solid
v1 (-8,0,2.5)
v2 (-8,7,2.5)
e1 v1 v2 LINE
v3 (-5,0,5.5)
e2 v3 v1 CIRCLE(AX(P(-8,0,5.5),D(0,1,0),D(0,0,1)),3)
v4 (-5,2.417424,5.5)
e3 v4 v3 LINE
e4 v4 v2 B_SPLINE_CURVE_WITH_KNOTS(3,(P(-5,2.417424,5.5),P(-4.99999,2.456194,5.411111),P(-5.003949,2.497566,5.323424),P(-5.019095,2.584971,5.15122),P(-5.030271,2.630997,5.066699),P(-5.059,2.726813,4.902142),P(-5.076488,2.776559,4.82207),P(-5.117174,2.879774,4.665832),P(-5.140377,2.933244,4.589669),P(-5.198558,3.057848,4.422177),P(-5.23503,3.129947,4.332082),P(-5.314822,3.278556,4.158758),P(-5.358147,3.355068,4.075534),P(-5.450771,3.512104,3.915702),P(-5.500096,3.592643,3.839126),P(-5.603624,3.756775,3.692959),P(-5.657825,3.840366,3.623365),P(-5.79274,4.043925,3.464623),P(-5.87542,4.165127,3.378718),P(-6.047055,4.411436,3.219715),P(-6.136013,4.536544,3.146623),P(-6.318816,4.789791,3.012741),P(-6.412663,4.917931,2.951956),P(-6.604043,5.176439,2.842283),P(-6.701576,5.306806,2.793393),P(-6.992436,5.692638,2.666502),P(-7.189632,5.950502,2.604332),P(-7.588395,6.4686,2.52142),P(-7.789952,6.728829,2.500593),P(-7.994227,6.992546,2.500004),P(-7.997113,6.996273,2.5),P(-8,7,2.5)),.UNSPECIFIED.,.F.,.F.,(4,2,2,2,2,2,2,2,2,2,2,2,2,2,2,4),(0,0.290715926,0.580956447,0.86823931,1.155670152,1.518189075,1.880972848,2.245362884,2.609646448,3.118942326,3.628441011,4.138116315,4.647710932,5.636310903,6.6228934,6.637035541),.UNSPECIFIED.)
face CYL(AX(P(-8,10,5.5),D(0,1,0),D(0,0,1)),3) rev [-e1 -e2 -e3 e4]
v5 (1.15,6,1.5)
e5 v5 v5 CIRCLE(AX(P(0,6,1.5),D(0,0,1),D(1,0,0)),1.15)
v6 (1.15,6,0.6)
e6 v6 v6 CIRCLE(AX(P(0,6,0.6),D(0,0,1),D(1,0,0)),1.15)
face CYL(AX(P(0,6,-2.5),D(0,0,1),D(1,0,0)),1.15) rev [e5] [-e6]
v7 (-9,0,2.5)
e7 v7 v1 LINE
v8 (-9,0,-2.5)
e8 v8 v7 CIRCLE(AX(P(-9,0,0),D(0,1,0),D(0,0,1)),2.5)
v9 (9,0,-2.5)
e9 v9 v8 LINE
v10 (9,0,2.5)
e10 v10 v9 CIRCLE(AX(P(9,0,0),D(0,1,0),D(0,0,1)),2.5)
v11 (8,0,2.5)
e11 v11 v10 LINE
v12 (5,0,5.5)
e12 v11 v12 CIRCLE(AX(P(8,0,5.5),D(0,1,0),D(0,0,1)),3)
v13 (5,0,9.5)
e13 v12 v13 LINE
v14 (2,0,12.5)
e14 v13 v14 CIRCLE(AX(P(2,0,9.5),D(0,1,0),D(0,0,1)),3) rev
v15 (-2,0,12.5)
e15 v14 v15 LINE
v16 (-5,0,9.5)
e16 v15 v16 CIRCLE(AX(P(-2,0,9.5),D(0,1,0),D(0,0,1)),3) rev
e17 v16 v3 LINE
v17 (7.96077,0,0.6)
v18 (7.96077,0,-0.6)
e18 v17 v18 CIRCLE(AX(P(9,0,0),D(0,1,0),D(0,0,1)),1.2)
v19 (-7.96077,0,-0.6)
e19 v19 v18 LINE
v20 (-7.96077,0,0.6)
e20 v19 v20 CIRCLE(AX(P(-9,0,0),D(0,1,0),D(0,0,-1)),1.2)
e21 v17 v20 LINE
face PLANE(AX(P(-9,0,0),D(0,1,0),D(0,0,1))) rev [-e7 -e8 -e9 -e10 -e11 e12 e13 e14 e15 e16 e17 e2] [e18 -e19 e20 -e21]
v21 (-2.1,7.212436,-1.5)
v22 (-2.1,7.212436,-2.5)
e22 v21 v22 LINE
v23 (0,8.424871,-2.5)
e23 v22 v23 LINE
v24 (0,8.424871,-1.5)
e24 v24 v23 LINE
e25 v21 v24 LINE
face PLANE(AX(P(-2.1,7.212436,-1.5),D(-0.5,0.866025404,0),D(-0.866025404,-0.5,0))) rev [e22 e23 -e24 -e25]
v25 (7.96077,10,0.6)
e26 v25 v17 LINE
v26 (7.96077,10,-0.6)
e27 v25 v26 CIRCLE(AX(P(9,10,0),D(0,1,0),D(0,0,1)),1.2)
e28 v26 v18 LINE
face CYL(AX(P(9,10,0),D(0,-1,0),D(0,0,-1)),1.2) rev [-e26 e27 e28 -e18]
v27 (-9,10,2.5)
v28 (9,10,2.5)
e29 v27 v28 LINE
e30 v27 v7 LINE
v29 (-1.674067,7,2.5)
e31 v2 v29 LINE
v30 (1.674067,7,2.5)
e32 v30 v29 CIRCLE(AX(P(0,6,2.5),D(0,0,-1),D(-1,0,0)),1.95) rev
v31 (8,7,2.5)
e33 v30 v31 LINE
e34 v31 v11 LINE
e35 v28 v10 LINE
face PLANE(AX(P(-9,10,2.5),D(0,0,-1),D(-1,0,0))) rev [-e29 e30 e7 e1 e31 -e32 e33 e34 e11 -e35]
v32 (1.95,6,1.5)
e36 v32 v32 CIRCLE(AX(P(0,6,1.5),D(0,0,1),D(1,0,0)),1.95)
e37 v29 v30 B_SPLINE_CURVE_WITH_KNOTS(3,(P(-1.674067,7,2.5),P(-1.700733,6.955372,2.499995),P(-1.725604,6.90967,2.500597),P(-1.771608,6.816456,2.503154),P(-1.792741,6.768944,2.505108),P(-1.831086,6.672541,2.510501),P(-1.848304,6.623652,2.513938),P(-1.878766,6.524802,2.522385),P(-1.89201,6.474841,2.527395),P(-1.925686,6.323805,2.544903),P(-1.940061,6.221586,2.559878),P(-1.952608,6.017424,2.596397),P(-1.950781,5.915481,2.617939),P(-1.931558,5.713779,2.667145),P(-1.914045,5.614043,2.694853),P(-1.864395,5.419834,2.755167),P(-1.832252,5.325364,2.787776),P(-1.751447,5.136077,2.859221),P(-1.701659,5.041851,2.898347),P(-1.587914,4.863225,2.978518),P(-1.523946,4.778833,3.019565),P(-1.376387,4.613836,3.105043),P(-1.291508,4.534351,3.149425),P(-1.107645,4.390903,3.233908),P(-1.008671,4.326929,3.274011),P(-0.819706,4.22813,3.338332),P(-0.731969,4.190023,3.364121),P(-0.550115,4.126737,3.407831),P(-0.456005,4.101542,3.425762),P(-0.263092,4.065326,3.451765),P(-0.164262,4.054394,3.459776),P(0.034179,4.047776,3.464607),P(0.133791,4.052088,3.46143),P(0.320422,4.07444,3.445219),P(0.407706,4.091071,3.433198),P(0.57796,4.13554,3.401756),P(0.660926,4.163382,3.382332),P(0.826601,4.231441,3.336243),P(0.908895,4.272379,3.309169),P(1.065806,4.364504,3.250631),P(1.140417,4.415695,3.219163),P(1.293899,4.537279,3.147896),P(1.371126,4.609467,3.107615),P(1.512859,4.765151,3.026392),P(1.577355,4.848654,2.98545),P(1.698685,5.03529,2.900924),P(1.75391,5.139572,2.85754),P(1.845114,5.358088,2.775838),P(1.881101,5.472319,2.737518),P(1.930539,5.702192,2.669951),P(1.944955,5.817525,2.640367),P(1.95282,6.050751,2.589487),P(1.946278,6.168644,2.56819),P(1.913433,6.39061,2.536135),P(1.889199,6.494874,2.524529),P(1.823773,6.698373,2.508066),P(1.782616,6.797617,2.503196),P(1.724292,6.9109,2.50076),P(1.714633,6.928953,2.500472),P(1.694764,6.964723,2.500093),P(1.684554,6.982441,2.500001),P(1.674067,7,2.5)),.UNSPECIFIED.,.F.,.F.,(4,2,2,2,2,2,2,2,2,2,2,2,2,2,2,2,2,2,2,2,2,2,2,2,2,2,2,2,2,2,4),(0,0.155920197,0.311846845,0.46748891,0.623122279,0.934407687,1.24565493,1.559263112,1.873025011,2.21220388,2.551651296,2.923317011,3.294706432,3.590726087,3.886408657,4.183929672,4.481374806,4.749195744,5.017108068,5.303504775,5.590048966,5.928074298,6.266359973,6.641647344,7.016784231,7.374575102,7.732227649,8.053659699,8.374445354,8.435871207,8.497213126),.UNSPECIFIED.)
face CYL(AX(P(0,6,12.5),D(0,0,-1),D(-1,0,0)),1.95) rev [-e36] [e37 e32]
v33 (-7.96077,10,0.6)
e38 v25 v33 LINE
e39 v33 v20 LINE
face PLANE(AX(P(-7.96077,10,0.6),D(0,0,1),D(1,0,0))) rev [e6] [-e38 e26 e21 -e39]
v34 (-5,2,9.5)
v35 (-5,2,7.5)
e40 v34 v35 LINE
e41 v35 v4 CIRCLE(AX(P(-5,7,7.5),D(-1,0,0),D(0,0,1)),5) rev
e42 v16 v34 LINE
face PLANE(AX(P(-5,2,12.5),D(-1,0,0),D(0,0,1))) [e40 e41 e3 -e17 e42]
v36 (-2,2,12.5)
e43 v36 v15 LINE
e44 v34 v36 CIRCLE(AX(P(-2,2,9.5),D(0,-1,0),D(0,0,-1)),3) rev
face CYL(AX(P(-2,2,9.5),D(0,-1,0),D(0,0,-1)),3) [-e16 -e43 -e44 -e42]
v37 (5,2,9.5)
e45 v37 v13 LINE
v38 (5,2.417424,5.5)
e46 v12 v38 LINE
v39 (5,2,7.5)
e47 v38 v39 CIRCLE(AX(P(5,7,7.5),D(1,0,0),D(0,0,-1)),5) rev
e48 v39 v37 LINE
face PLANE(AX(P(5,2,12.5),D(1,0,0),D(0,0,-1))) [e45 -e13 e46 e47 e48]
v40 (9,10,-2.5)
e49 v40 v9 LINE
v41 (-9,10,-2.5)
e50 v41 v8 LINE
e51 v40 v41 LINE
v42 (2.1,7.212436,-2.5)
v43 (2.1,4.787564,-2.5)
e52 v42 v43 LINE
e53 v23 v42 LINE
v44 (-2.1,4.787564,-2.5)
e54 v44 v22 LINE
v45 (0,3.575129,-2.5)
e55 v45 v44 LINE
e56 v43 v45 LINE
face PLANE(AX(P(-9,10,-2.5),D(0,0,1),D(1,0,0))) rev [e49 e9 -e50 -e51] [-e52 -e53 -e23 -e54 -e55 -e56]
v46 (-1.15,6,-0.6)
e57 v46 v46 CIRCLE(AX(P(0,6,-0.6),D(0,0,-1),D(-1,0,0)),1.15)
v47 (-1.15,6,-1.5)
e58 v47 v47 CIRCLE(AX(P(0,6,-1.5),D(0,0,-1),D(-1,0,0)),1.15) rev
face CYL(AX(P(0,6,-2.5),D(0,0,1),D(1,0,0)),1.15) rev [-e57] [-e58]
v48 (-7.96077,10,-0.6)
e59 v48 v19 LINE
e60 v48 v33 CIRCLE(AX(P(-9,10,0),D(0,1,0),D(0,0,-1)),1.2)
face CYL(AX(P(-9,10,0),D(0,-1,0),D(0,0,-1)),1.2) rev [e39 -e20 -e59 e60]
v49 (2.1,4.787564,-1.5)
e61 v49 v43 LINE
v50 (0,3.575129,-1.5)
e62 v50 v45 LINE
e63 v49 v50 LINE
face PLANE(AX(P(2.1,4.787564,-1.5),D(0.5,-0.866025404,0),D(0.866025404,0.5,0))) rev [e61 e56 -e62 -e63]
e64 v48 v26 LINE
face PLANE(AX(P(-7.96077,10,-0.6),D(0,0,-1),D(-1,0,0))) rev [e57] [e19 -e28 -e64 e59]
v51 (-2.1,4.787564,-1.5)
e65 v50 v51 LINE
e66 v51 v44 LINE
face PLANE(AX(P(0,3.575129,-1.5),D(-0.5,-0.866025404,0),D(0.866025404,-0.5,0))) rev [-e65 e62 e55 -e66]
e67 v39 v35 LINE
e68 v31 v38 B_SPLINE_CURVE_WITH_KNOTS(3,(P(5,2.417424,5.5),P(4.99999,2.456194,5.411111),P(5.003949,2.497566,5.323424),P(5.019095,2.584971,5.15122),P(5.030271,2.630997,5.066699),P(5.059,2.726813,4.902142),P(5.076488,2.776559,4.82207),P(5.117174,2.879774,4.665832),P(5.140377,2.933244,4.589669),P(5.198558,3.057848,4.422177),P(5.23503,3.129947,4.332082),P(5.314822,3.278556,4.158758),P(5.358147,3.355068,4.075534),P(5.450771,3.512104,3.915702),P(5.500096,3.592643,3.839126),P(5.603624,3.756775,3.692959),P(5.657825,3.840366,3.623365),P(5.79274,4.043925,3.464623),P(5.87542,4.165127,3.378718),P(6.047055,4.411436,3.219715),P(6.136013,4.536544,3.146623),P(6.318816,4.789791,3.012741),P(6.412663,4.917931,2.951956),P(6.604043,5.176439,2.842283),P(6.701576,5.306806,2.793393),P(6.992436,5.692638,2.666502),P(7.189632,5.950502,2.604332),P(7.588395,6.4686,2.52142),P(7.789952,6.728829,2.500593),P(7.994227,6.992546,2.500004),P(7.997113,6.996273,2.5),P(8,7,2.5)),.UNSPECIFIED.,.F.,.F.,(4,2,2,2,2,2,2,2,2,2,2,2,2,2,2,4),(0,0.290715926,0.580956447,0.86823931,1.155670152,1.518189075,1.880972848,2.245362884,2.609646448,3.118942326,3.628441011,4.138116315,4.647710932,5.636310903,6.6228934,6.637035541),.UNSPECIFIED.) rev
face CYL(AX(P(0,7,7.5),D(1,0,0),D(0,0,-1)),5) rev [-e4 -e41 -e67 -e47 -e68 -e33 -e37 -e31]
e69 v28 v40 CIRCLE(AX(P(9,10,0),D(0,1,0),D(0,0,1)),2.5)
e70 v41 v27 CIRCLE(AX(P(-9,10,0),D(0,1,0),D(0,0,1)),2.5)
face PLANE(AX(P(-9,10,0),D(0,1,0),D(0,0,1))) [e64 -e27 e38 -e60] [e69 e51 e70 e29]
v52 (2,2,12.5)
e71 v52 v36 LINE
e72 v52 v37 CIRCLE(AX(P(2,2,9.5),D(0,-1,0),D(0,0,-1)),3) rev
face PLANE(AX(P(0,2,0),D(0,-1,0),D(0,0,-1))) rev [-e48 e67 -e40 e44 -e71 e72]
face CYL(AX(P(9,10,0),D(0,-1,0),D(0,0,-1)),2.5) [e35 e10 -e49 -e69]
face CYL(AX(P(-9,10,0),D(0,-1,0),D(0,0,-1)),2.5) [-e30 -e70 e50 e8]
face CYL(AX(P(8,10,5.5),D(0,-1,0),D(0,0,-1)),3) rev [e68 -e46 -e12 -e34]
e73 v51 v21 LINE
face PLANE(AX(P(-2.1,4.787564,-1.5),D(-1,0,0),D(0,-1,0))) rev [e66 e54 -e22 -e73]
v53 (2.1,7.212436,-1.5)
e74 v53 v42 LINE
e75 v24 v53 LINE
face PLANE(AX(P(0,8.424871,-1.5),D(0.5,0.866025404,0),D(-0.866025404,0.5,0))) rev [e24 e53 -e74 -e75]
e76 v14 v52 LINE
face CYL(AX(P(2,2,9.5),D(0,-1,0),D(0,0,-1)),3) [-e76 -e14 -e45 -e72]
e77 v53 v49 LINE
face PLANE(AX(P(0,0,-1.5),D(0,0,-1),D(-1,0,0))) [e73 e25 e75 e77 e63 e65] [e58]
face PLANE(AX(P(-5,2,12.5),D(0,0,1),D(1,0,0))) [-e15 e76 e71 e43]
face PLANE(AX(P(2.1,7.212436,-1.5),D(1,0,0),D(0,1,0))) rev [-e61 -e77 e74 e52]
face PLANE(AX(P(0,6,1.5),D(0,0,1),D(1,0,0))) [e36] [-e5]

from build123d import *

# Parameters (mm, degrees)
SKETCH_1_R               = 1.2
EXTRUDE_1_DEPTH          = 10
SKETCH_3_W               = 10
SKETCH_3_H               = 15
EXTRUDE_2_DEPTH          = 2
FILLET_2_R               = 3
FILLET_START             = -5
FILLET_3_DEPTH           = 10
FILLET_START_2           = 2
FILLET_3_2_DEPTH         = 4.9438
FILLET_START_3           = -9
FILLET_3_3_DEPTH         = 17
SKETCH_4_W               = 15.92154
SKETCH_4_H               = 1.2
CUT_EXTRUDE_2_DEPTH      = 20.710403
CUT_EXTRUDE_4_DEPTH      = 19.227726
CUT_EXTRUDE_4_DEPTH_BACK = 1
SKETCH_6_R               = 1.95
SKETCH_7_R               = 1.15
CUT_EXTRUDE_5_DEPTH      = 19.794946
CUT_EXTRUDE_6_DEPTH      = 1


with BuildPart() as part:
    # 草图1 → 凸台-拉伸1 (new body)
    with BuildSketch(Plane(origin=(0, 0, 0), x_dir=(1, 0, 0), z_dir=(0, 1, 0))):
        with BuildLine():
            Line((-9, 2.5), (9, 2.5))
            ThreePointArc((9, 2.5), (11.5, 0), (9, -2.5))
            Line((9, -2.5), (-9, -2.5))
            ThreePointArc((-9, -2.5), (-11.5, 0), (-9, 2.5))
        make_face()
        with Locations(Location((9, 0, 0), (0, 0, 270))):
            Circle(SKETCH_1_R, mode=Mode.SUBTRACT)
        with Locations(Location((-9, 0, 0), (0, 0, 90))):
            Circle(SKETCH_1_R, mode=Mode.SUBTRACT)
    extrude(amount=EXTRUDE_1_DEPTH)

    # 草图3 → 凸台-拉伸2 (add)
    with BuildSketch(Plane.XZ):
        with Locations((0, 5)):
            Rectangle(SKETCH_3_W, SKETCH_3_H)
    extrude(amount=-EXTRUDE_2_DEPTH)

    # 圆角2
    fillet_2_edges = [part.edges().sort_by_distance(p)[0] for p in [
        (5, 1, 12.5),
        (5, 1, 2.5),
        (-5, 1, 2.5),
        (-5, 1, 12.5),
    ]]
    fillet(fillet_2_edges, radius=FILLET_2_R)

    # 圆角3: read off the stored shape, not the designer's step
    # 圆角3 outline → 圆角3 (add)
    with BuildSketch(Plane.YZ.offset(FILLET_START)):
        with BuildLine():
            ThreePointArc((7, 2.5), (3.464466, 3.964466), (2, 7.5))
            Line((2, 7.5), (2, 2.5))
            Line((2, 2.5), (7, 2.5))
        make_face()
    extrude(amount=FILLET_3_DEPTH)

    # Fillet 3 2 outline → Fillet 3 2 (add)
    with BuildSketch(Plane(origin=(0, 0, 0), x_dir=(1, 0, 0), z_dir=(0, 1, 0)).offset(FILLET_START_2)):
        with BuildLine():
            Line((5, -2.5), (5, -5.5))
            ThreePointArc((5, -5.5), (5.87868, -3.37868), (8, -2.5))
            Line((8, -2.5), (5, -2.5))
        make_face()
        with BuildLine():
            Line((-5, -5.5), (-5, -2.5))
            Line((-5, -2.5), (-8, -2.5))
            ThreePointArc((-8, -2.5), (-5.87868, -3.37868), (-5, -5.5))
        make_face()
    extrude(amount=FILLET_3_2_DEPTH)

    # Fillet 3 3 outline → Fillet 3 3 (cut)
    with BuildSketch(Plane.YZ.offset(FILLET_START_3)):
        with BuildLine():
            Line((8, 7), (2.025063, 7))
            ThreePointArc((2.025063, 7), (3.625111, 3.81081), (6.9438, 2.500316))
            ThreePointArc((6.9438, 2.500316), (6.9719, 2.500079), (7, 2.5))
            Line((7, 2.5), (8, 2.5))
            Line((8, 2.5), (8, 7))
        make_face()
    extrude(amount=FILLET_3_3_DEPTH, mode=Mode.SUBTRACT)

    # 草图4 → 切除-拉伸2 (cut, through all)
    with BuildSketch(Plane.XZ):
        Rectangle(SKETCH_4_W, SKETCH_4_H)
    extrude(amount=-CUT_EXTRUDE_2_DEPTH, mode=Mode.SUBTRACT)

    # 草图6 → 切除-拉伸4 (cut, two sides: drawn at the far end of the back side and taken through both)
    with BuildSketch(Plane.XY.offset(2.5).offset(-CUT_EXTRUDE_4_DEPTH_BACK)):
        with Locations(Location((0, 6, 0), (0, 0, 149.148114))):
            Circle(SKETCH_6_R)
    extrude(amount=CUT_EXTRUDE_4_DEPTH + CUT_EXTRUDE_4_DEPTH_BACK, mode=Mode.SUBTRACT)

    # 草图7 → 切除-拉伸5 (cut, through all)
    with BuildSketch(Plane.XY.offset(1.5)):
        with Locations((0, 6)):
            Circle(SKETCH_7_R)
    extrude(amount=-CUT_EXTRUDE_5_DEPTH, mode=Mode.SUBTRACT)

    # 草图8 → 切除-拉伸6 (cut)
    with BuildSketch(Plane(origin=(0, 0, -2.5), x_dir=(-1, 0, 0), z_dir=(0, 0, -1))):
        Polygon((0, 8.424871), (-2.1, 7.212436), (-2.1, 4.787564), (0, 3.575129), (2.1, 4.787564), (2.1, 7.212436), align=None)
    extrude(amount=-CUT_EXTRUDE_6_DEPTH, mode=Mode.SUBTRACT)


solid = part.part
